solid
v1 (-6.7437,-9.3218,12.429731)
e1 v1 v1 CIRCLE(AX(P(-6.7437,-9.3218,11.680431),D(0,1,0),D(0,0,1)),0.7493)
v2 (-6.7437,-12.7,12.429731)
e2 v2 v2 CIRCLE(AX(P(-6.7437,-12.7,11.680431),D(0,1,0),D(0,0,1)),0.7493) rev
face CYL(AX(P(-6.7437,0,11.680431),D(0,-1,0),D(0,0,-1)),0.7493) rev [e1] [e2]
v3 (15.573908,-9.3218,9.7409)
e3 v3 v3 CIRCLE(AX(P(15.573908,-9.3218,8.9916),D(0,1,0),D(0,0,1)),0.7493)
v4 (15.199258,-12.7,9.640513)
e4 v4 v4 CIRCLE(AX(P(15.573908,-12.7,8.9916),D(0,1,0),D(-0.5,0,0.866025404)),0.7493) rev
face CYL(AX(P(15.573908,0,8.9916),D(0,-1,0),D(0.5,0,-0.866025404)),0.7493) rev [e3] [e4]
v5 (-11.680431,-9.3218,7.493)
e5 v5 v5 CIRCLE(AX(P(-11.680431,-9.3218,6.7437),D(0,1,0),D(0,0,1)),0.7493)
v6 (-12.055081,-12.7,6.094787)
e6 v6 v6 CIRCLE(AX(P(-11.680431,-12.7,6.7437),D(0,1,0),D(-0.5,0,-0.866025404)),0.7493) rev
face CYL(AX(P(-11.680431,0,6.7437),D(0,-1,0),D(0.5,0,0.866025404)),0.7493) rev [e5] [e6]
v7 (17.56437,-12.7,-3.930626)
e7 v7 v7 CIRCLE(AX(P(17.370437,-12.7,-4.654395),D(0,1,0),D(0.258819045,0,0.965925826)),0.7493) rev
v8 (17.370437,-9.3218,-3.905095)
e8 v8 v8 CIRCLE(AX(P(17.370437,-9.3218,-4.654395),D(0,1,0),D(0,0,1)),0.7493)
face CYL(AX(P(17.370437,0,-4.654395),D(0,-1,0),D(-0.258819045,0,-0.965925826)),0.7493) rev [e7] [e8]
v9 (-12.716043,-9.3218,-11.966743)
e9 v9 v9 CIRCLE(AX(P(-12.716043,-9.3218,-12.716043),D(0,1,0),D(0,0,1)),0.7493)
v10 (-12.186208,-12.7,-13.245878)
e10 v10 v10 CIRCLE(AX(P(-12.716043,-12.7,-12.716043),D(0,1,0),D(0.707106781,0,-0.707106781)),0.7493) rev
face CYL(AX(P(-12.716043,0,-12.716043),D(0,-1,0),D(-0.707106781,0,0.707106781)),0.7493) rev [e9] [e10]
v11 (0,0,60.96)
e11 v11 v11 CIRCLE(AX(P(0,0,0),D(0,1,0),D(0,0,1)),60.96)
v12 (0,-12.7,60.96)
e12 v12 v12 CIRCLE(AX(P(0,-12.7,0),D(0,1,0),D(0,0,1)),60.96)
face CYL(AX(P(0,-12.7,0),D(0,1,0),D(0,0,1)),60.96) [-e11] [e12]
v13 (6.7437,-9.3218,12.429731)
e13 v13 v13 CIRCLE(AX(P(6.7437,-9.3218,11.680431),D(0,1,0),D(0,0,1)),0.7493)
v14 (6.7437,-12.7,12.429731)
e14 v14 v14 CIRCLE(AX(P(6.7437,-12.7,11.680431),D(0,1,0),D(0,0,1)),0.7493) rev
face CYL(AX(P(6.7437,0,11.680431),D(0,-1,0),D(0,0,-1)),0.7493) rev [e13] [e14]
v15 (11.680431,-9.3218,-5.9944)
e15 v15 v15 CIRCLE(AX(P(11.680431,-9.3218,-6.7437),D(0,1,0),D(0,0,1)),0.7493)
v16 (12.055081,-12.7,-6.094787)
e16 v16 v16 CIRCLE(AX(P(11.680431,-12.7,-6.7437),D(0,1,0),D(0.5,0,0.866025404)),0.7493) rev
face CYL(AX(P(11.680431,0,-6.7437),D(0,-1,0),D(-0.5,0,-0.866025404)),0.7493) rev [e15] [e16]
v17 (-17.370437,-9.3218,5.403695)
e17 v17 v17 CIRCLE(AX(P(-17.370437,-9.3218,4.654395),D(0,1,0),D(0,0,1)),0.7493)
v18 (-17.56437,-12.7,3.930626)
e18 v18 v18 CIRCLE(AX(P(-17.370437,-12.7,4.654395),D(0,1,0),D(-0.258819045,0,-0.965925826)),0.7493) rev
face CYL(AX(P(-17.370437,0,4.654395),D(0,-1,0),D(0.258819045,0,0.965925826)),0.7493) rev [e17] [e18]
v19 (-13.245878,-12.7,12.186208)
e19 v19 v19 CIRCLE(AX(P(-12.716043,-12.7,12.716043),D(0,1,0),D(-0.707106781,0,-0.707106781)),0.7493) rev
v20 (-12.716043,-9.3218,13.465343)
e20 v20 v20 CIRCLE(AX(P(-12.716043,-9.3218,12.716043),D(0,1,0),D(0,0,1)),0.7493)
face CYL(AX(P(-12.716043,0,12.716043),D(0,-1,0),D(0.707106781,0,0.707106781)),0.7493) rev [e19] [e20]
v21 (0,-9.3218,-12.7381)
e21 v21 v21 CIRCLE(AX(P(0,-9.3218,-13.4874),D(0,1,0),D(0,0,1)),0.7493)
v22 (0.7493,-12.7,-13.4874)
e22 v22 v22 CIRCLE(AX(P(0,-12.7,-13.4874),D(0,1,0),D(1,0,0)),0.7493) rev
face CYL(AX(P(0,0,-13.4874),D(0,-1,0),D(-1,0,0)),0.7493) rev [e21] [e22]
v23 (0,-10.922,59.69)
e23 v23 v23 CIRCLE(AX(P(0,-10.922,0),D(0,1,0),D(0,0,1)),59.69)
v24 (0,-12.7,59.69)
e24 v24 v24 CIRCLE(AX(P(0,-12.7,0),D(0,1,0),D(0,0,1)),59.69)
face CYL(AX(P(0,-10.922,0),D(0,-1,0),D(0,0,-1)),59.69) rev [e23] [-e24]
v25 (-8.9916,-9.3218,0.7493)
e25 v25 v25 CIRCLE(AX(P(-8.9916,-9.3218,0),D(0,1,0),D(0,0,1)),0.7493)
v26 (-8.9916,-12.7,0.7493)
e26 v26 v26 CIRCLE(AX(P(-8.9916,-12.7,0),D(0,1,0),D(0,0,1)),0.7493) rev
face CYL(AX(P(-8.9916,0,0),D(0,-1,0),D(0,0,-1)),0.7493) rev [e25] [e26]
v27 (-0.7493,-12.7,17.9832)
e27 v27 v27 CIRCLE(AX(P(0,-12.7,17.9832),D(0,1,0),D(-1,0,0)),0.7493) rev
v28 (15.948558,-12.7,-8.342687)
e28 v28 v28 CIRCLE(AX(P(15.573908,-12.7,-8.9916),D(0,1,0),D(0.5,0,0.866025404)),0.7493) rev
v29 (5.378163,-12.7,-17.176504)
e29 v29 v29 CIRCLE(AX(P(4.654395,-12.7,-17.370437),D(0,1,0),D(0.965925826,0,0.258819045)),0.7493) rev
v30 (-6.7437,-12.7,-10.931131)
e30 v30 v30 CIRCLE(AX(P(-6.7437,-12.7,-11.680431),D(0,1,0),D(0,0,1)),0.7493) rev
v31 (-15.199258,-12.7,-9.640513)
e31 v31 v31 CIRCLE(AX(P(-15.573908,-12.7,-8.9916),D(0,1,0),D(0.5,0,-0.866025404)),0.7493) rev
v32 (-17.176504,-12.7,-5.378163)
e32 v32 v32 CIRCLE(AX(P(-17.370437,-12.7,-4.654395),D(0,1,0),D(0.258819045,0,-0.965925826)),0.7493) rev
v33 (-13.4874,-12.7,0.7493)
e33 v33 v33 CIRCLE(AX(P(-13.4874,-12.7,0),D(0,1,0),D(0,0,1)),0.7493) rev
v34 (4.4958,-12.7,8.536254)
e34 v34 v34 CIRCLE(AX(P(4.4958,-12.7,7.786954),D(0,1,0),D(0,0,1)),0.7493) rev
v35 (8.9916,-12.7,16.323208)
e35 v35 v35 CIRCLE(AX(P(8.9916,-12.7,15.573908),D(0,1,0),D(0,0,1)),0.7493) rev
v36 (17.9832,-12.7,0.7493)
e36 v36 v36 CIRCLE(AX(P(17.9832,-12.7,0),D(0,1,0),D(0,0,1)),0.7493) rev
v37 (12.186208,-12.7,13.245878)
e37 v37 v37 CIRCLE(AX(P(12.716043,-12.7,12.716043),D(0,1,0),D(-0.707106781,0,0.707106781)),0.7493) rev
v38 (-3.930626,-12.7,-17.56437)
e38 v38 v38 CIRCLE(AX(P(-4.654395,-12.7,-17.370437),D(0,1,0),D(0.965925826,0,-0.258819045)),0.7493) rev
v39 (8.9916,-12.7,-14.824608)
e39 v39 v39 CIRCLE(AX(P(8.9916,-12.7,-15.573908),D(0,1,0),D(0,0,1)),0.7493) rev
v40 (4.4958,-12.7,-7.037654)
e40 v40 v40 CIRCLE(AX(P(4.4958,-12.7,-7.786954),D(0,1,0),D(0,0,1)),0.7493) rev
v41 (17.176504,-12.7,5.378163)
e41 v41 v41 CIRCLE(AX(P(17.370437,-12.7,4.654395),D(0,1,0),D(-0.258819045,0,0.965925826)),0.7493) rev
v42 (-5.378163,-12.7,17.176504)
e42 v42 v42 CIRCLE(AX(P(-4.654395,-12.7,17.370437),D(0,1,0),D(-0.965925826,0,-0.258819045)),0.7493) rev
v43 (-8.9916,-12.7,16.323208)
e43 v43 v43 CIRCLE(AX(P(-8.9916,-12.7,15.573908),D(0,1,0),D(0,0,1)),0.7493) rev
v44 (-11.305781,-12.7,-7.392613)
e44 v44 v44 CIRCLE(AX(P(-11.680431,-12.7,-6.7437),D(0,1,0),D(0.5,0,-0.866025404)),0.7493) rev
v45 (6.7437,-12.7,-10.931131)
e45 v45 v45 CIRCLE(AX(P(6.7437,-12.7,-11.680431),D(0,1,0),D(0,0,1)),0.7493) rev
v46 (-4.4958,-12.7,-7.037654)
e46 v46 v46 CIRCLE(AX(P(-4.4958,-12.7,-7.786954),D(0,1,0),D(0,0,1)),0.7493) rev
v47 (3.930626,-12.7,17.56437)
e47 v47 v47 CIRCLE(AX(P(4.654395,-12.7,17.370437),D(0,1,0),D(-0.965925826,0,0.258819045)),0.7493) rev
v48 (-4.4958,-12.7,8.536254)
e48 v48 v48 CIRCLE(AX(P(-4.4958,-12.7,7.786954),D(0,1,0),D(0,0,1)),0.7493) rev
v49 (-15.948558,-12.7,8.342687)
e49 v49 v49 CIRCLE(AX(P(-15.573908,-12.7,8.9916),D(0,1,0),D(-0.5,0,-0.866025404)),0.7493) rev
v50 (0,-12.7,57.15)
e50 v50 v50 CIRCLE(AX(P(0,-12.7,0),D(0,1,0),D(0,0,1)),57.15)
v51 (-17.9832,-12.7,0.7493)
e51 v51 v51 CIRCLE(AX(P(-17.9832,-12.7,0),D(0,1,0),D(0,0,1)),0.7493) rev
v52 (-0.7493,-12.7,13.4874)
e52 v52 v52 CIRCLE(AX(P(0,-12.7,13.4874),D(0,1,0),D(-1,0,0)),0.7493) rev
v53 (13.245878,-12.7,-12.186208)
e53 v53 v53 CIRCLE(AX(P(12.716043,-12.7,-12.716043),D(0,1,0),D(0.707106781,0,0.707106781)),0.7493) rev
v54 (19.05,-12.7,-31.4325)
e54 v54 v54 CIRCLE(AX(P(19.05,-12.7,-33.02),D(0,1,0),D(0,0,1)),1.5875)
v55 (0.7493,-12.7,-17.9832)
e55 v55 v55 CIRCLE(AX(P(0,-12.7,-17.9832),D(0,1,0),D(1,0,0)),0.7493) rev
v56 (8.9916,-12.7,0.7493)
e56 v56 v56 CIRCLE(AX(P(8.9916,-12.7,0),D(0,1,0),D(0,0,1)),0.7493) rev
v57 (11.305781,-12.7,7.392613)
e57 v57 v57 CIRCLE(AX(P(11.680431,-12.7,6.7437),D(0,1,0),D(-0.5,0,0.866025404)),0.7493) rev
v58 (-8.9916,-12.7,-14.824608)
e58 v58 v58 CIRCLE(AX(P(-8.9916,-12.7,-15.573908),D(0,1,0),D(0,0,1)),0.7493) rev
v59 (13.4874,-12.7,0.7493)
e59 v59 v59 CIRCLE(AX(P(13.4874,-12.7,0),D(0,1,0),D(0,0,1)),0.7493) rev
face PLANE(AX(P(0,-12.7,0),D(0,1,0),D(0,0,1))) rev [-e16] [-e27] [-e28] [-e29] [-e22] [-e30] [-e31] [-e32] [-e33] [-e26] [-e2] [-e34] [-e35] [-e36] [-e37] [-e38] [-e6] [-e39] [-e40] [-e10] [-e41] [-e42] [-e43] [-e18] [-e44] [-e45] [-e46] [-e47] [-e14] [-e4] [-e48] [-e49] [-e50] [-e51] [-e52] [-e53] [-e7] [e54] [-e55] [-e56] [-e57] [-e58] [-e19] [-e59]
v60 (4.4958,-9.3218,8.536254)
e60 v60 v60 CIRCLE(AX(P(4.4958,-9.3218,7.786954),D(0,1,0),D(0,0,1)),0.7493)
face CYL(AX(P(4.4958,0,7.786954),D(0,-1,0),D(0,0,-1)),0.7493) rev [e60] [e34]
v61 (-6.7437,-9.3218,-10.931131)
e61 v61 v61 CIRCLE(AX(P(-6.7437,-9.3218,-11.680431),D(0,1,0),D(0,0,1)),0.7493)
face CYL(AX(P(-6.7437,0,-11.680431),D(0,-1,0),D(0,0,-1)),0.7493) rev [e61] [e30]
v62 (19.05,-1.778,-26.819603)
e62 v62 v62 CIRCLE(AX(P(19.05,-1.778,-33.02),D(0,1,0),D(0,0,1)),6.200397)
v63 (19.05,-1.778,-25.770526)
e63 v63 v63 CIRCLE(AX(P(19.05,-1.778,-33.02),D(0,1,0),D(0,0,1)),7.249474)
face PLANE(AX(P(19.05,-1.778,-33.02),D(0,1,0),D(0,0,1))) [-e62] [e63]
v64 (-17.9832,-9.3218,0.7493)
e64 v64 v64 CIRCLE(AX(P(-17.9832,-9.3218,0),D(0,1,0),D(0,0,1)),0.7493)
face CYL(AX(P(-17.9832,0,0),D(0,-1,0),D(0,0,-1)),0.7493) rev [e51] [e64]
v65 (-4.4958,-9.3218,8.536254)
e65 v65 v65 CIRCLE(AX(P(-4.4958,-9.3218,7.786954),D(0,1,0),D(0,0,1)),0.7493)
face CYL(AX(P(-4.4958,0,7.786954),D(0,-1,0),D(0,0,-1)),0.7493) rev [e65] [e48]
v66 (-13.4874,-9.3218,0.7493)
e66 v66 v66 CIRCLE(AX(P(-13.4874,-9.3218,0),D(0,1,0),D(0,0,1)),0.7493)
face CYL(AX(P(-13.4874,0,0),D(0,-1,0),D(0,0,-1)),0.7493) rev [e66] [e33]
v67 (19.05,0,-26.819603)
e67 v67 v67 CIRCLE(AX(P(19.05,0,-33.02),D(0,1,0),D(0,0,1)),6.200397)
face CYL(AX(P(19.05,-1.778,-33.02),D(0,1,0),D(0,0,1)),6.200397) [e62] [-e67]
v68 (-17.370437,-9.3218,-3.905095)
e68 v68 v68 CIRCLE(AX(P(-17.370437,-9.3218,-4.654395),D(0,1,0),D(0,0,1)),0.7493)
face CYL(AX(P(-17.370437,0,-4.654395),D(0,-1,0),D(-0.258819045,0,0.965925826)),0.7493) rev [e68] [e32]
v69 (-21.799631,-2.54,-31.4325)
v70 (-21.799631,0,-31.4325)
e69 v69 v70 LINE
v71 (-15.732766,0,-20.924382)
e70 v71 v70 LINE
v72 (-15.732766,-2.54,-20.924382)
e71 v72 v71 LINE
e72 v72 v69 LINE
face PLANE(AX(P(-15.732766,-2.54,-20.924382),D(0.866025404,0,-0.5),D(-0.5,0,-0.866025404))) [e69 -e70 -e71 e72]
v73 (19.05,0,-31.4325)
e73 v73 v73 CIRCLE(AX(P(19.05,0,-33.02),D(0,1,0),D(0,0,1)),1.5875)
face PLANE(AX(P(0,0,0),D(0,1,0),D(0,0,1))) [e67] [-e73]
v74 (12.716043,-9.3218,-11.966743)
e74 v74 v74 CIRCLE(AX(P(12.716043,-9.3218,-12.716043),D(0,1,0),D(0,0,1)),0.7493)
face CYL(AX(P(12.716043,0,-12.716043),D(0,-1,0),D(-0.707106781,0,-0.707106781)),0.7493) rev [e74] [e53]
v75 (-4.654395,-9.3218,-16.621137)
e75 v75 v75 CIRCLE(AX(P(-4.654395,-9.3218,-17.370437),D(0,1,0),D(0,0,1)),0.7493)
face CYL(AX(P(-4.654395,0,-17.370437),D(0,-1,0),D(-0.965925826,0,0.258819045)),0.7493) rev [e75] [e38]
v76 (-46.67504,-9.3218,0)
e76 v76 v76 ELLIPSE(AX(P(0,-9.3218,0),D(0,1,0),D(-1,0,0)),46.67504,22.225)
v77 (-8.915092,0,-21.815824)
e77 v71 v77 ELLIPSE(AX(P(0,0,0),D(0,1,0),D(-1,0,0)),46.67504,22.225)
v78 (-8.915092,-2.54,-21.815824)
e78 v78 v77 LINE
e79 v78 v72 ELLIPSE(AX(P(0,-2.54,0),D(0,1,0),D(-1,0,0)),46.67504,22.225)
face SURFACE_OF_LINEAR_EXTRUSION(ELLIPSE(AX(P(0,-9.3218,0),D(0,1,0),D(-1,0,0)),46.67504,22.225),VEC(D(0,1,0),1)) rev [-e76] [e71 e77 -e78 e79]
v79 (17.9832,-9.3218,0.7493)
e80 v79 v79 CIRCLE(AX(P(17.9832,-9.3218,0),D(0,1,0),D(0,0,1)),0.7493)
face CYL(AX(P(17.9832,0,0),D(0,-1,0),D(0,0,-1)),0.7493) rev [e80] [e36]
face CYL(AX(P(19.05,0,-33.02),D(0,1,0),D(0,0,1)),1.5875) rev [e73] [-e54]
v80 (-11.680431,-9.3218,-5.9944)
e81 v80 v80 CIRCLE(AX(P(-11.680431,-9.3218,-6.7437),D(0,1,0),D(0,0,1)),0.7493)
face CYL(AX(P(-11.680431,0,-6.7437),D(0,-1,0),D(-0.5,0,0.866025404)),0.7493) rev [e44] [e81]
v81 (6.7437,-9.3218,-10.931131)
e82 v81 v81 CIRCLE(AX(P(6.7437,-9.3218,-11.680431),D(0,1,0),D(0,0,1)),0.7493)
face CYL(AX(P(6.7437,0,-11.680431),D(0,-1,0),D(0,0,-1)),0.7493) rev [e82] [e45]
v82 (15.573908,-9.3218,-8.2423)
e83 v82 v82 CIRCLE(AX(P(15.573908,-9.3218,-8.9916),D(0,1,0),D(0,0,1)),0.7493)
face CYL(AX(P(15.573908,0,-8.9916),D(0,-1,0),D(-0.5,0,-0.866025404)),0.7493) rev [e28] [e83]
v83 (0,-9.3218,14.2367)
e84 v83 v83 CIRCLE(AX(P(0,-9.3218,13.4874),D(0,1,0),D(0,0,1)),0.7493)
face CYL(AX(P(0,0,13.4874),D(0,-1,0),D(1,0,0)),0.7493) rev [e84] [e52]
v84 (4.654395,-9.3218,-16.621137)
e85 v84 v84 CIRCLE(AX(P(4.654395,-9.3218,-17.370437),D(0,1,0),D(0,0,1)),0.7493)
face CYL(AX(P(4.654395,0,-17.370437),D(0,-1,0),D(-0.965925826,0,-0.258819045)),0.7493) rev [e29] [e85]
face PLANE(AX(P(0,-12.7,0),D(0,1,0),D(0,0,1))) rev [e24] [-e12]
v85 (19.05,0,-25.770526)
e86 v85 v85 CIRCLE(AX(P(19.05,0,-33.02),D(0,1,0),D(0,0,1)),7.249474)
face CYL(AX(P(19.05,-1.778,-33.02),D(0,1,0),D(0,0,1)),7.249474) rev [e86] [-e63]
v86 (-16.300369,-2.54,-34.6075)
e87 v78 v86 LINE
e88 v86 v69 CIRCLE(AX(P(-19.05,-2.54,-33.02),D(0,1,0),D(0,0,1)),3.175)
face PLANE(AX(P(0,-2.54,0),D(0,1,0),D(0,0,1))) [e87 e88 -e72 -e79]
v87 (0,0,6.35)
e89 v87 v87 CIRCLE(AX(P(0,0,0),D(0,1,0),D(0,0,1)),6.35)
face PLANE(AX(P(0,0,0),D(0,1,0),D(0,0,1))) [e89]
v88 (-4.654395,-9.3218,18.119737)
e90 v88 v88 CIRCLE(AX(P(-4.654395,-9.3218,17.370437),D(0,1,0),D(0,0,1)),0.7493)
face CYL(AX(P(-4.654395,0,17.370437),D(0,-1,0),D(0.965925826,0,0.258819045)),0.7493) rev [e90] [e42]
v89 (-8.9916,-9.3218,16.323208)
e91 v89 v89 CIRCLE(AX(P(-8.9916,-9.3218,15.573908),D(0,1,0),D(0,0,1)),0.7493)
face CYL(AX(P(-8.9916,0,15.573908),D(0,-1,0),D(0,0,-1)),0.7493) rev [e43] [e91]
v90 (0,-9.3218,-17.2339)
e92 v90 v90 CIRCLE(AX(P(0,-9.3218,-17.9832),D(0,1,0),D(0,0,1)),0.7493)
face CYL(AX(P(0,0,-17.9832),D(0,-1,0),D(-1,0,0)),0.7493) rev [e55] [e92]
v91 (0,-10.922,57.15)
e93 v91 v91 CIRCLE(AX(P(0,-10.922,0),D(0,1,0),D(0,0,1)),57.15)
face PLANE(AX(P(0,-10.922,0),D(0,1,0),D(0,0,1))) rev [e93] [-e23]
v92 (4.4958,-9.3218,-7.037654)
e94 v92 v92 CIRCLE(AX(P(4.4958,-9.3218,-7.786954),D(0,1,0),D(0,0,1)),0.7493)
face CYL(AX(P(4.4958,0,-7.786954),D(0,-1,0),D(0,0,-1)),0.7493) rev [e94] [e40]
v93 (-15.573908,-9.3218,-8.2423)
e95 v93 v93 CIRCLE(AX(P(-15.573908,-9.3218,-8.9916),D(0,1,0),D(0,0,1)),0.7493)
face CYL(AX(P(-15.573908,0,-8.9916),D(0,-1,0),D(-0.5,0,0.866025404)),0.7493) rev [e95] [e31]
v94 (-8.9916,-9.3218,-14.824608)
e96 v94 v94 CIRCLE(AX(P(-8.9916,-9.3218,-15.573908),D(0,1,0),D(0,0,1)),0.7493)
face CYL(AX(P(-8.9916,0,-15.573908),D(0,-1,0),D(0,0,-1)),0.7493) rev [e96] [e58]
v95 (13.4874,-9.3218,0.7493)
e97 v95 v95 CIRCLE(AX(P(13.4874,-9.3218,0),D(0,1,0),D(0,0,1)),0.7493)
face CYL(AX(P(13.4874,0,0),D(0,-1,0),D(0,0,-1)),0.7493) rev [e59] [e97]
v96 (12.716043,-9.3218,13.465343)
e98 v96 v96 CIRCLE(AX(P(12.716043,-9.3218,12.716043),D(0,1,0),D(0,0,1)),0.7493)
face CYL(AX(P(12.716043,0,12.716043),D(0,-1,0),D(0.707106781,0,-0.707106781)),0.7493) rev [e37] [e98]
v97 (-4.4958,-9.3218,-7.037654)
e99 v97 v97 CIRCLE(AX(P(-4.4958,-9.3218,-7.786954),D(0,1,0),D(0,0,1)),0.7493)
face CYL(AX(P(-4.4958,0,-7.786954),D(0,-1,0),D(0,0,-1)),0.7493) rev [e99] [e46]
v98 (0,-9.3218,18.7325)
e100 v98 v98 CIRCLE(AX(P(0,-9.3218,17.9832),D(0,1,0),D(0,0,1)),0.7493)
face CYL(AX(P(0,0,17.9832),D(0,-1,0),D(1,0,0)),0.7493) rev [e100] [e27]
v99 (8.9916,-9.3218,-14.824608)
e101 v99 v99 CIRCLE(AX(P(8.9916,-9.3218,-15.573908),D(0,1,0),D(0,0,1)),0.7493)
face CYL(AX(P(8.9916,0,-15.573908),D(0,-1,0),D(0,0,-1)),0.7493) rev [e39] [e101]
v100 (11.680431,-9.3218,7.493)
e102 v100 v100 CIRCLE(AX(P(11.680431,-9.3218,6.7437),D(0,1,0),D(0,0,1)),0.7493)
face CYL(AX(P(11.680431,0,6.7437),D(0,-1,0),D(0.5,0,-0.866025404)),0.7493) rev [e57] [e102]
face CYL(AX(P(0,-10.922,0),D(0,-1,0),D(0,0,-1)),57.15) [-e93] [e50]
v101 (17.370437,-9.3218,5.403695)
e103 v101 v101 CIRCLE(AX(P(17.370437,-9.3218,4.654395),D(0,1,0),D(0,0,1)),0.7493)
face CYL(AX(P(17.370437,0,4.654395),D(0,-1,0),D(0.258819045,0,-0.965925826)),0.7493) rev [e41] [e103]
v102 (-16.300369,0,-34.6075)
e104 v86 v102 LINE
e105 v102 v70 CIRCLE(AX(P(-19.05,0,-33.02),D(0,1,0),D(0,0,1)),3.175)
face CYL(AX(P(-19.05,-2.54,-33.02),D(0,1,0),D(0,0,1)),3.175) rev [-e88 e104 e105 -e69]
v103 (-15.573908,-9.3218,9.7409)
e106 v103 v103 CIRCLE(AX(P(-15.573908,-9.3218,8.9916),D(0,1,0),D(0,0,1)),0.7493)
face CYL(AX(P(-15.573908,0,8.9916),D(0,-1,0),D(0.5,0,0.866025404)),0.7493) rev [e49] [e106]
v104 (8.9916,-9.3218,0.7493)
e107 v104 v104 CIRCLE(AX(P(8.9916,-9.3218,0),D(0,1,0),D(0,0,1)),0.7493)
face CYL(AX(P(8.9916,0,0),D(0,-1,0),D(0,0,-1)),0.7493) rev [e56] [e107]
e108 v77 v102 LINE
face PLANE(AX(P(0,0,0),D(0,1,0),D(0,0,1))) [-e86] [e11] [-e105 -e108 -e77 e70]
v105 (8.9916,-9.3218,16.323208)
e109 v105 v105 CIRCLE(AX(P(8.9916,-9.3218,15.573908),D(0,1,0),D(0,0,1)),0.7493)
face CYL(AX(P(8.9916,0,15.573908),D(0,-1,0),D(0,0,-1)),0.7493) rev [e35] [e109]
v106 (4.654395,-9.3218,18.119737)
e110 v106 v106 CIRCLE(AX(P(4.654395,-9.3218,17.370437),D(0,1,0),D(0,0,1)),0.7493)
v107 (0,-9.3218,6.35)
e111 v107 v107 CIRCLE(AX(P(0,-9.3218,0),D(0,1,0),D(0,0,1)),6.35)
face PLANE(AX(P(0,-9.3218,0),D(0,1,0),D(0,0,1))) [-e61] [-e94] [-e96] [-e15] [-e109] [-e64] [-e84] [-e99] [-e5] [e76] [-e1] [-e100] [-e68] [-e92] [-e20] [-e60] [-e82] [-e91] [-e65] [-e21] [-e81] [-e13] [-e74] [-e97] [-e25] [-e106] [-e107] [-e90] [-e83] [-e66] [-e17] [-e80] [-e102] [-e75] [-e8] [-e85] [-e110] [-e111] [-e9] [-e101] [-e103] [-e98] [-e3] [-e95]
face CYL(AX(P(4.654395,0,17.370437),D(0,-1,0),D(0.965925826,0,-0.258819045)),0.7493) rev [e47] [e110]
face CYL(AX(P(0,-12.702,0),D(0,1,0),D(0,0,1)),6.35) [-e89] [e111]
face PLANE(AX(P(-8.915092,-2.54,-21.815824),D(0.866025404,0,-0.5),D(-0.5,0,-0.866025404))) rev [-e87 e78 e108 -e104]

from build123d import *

# Parameters (mm, degrees)
SKETCH1_R                       = 60.96
BILLET_DEPTH                    = 12.7
SKETCH4_R                       = 0.7493
FIRST_KEROSENE_OUTLET_DEPTH     = 88.140881336
PRIMARY_HOLES_COUNT             = 6
SECOND_START                    = -12.7
SECOND_RING_OUTLINE_R           = 0.7493
SECOND_RING_DEPTH               = 12.7
THIRD_START                     = -12.7
THIRD_RING_OUTLINE_R            = 0.7493
THIRD_RING_DEPTH                = 12.7
SKETCH18_RX                     = 46.67504
SKETCH18_RY                     = 22.225
KEROSENE_WELL_DEPTH             = 9.3218
SKETCH17_R                      = 6.35
BOSS_EXTRUDE1_DEPTH             = 2.54
BOSS_EXTRUDE1_DIRECTION_2_REACH = 89.141
SKETCH21_R                      = 6.35
CUT_EXTRUDE1_DEPTH              = 2.54
CUT_EXTRUDE2_DEPTH              = 2.54
SKETCH15_R                      = 59.69
SKETCH15_R_2                    = 57.15
CUT_EXTRUDE3_DEPTH              = 1.778
F_1_8_0_125_DIAMETER_HOLE2_D    = 3.175
SKETCH31_R                      = 7.24947448
SKETCH31_R_2                    = 6.200396603
CUT_EXTRUDE4_DEPTH              = 1.778


# Read off the part's stored shape, not the designer's step: Second ring, Third Ring
with BuildPart() as part:
    # Sketch1 → Billet (new body)
    with BuildSketch(Plane(origin=(0, 0, 0), x_dir=(1, 0, 0), z_dir=(0, 1, 0))):
        with Locations(Location((0, 0, 0), (0, 0, 270))):
            Circle(SKETCH1_R)
    extrude(amount=-BILLET_DEPTH)

    # Sketch4 → First Kerosene Outlet (cut, symmetric)
    with BuildSketch(Plane(origin=(0, -12.7, 0), x_dir=(1, 0, 0), z_dir=(0, 1, 0))):
        with Locations(Location((8.9916, 0, 0), (0, 0, 270))):
            Circle(SKETCH4_R)
        with Locations(Location((13.4874, 0, 0), (0, 0, 270))):
            Circle(SKETCH4_R)
        with Locations(Location((17.9832, 0, 0), (0, 0, 270))):
            Circle(SKETCH4_R)
    first_kerosene_outlet = extrude(amount=FIRST_KEROSENE_OUTLET_DEPTH, both=True, mode=Mode.SUBTRACT)

    # Primary Holes: First Kerosene Outlet ×6 about axis
    primary_holes_axis = Axis((0, 0, 0), (0, 1, 0))
    for i in range(1, PRIMARY_HOLES_COUNT):
        add(first_kerosene_outlet.rotate(primary_holes_axis, i * 360 / PRIMARY_HOLES_COUNT), mode=Mode.SUBTRACT)

    # Second ring outline → Second ring (cut)
    with BuildSketch(Plane(origin=(0, 0, 0), x_dir=(1, 0, 0), z_dir=(0, 1, 0)).offset(SECOND_START)):
        with Locations((11.680431031, 6.7437)):
            Circle(SECOND_RING_OUTLINE_R)
        with Locations((0, 13.4874)):
            Circle(SECOND_RING_OUTLINE_R)
        with Locations((-11.680431031, 6.7437)):
            Circle(SECOND_RING_OUTLINE_R)
        with Locations((-11.680431031, -6.7437)):
            Circle(SECOND_RING_OUTLINE_R)
        with Locations((0, -13.4874)):
            Circle(SECOND_RING_OUTLINE_R)
        with Locations((11.680431031, -6.7437)):
            Circle(SECOND_RING_OUTLINE_R)
    extrude(amount=SECOND_RING_DEPTH, mode=Mode.SUBTRACT)

    # Third Ring outline → Third Ring (cut)
    with BuildSketch(Plane(origin=(0, 0, 0), x_dir=(1, 0, 0), z_dir=(0, 1, 0)).offset(THIRD_START)):
        with Locations((17.370437319, 4.654394652)):
            Circle(THIRD_RING_OUTLINE_R)
        with Locations((15.573908041, 8.9916)):
            Circle(THIRD_RING_OUTLINE_R)
        with Locations((12.716042667, 12.716042667)):
            Circle(THIRD_RING_OUTLINE_R)
        with Locations((4.654394652, 17.370437319)):
            Circle(THIRD_RING_OUTLINE_R)
        with Locations((0, 17.9832)):
            Circle(THIRD_RING_OUTLINE_R)
        with Locations((-4.654394652, 17.370437319)):
            Circle(THIRD_RING_OUTLINE_R)
        with Locations((-12.716042667, 12.716042667)):
            Circle(THIRD_RING_OUTLINE_R)
        with Locations((-15.573908041, 8.9916)):
            Circle(THIRD_RING_OUTLINE_R)
        with Locations((-17.370437319, 4.654394652)):
            Circle(THIRD_RING_OUTLINE_R)
        with Locations((-17.370437319, -4.654394652)):
            Circle(THIRD_RING_OUTLINE_R)
        with Locations((-15.573908041, -8.9916)):
            Circle(THIRD_RING_OUTLINE_R)
        with Locations((-12.716042667, -12.716042667)):
            Circle(THIRD_RING_OUTLINE_R)
        with Locations((-4.654394652, -17.370437319)):
            Circle(THIRD_RING_OUTLINE_R)
        with Locations((0, -17.9832)):
            Circle(THIRD_RING_OUTLINE_R)
        with Locations((4.654394652, -17.370437319)):
            Circle(THIRD_RING_OUTLINE_R)
        with Locations((12.716042667, -12.716042667)):
            Circle(THIRD_RING_OUTLINE_R)
        with Locations((15.573908041, -8.9916)):
            Circle(THIRD_RING_OUTLINE_R)
        with Locations((17.370437319, -4.654394652)):
            Circle(THIRD_RING_OUTLINE_R)
    extrude(amount=THIRD_RING_DEPTH, mode=Mode.SUBTRACT)

    # Sketch18 → Kerosene Well (cut)
    with BuildSketch(Plane(origin=(0, 0, 0), x_dir=(1, 0, 0), z_dir=(0, 1, 0))):
        with Locations(Location((0, 0), (0, 0, -180))):
            Ellipse(SKETCH18_RX, SKETCH18_RY)
    extrude(amount=-KEROSENE_WELL_DEPTH, mode=Mode.SUBTRACT)

    # Sketch17 → Boss-Extrude1 (add)
    with BuildSketch(Plane(origin=(0, 0, 0), x_dir=(1, 0, 0), z_dir=(0, 1, 0))):
        with Locations(Location((0, 0, 0), (0, 0, 270))):
            Circle(SKETCH17_R)
    extrude(amount=BOSS_EXTRUDE1_DEPTH)

    # Sketch17 → Boss-Extrude1 direction 2 (add, up to next)
    with BuildSketch(Plane(origin=(0, 0, 0), x_dir=(1, 0, 0), z_dir=(0, 1, 0)), mode=Mode.PRIVATE) as boss_extrude1_direction_2_sk1:
        with Locations(Location((0, 0, 0), (0, 0, 270))):
            Circle(SKETCH17_R)
    boss_extrude1_direction_2_tool1 = extrude(boss_extrude1_direction_2_sk1.sketch, amount=-BOSS_EXTRUDE1_DIRECTION_2_REACH, mode=Mode.PRIVATE) - part.part
    add(boss_extrude1_direction_2_tool1.solids().sort_by_distance((0, 0, 0))[0])

    # Sketch21 → Cut-Extrude1 (cut)
    with BuildSketch(Plane(origin=(0, 2.54, 0), x_dir=(1, 0, 0), z_dir=(0, 1, 0))):
        with Locations(Location((0, 0, 0), (0, 0, 270))):
            Circle(SKETCH21_R)
    extrude(amount=-CUT_EXTRUDE1_DEPTH, mode=Mode.SUBTRACT)

    # Sketch24 → Cut-Extrude2 (cut)
    with BuildSketch(Plane(origin=(0, 0, 0), x_dir=(1, 0, 0), z_dir=(0, 1, 0))):
        with BuildLine():
            Line((-15.732765962, 20.924382105), (-21.799630657, 31.4325))
            ThreePointArc((-21.799630657, 31.4325), (-20.6375, 35.769630657), (-16.300369343, 34.6075))
            Line((-16.300369343, 34.6075), (-8.915091663, 21.81582383))
            add(Edge.make_bspline(
                [(-8.915091663, 21.81582383), (-12.395027666, 21.493390748), (-15.732765962, 20.924382105)],
                knots=[4.904573252, 4.904573252, 4.904573252, 5.056192247, 5.056192247, 5.056192247], degree=2, weights=[1, 0.997127836, 1]))
        make_face()
    extrude(amount=-CUT_EXTRUDE2_DEPTH, mode=Mode.SUBTRACT)

    # Sketch15 → Cut-Extrude3 (cut)
    with BuildSketch(Plane(origin=(0, -12.7, 0), x_dir=(1, 0, 0), z_dir=(0, 1, 0))):
        with Locations(Location((0, 0, 0), (0, 0, 270))):
            Circle(SKETCH15_R)
        with Locations(Location((0, 0, 0), (0, 0, 270))):
            Circle(SKETCH15_R_2, mode=Mode.SUBTRACT)
    extrude(amount=CUT_EXTRUDE3_DEPTH, mode=Mode.SUBTRACT)

    # 1/8 (0.125) Diameter Hole2 (through all)
    with Locations(Plane(origin=(19.05, 0, -33.02), x_dir=(0, 0, 1), z_dir=(0, 1, 0))):
        with Locations((0, 0)):
            Hole(F_1_8_0_125_DIAMETER_HOLE2_D / 2)

    # Sketch31 → Cut-Extrude4 (cut)
    with BuildSketch(Plane(origin=(0, 0, 0), x_dir=(1, 0, 0), z_dir=(0, 1, 0))):
        with Locations(Location((19.05, 33.02, 0), (0, 0, 270))):
            Circle(SKETCH31_R)
        with Locations(Location((19.05, 33.02, 0), (0, 0, 270))):
            Circle(SKETCH31_R_2, mode=Mode.SUBTRACT)
    extrude(amount=-CUT_EXTRUDE4_DEPTH, mode=Mode.SUBTRACT)


solid = part.part
